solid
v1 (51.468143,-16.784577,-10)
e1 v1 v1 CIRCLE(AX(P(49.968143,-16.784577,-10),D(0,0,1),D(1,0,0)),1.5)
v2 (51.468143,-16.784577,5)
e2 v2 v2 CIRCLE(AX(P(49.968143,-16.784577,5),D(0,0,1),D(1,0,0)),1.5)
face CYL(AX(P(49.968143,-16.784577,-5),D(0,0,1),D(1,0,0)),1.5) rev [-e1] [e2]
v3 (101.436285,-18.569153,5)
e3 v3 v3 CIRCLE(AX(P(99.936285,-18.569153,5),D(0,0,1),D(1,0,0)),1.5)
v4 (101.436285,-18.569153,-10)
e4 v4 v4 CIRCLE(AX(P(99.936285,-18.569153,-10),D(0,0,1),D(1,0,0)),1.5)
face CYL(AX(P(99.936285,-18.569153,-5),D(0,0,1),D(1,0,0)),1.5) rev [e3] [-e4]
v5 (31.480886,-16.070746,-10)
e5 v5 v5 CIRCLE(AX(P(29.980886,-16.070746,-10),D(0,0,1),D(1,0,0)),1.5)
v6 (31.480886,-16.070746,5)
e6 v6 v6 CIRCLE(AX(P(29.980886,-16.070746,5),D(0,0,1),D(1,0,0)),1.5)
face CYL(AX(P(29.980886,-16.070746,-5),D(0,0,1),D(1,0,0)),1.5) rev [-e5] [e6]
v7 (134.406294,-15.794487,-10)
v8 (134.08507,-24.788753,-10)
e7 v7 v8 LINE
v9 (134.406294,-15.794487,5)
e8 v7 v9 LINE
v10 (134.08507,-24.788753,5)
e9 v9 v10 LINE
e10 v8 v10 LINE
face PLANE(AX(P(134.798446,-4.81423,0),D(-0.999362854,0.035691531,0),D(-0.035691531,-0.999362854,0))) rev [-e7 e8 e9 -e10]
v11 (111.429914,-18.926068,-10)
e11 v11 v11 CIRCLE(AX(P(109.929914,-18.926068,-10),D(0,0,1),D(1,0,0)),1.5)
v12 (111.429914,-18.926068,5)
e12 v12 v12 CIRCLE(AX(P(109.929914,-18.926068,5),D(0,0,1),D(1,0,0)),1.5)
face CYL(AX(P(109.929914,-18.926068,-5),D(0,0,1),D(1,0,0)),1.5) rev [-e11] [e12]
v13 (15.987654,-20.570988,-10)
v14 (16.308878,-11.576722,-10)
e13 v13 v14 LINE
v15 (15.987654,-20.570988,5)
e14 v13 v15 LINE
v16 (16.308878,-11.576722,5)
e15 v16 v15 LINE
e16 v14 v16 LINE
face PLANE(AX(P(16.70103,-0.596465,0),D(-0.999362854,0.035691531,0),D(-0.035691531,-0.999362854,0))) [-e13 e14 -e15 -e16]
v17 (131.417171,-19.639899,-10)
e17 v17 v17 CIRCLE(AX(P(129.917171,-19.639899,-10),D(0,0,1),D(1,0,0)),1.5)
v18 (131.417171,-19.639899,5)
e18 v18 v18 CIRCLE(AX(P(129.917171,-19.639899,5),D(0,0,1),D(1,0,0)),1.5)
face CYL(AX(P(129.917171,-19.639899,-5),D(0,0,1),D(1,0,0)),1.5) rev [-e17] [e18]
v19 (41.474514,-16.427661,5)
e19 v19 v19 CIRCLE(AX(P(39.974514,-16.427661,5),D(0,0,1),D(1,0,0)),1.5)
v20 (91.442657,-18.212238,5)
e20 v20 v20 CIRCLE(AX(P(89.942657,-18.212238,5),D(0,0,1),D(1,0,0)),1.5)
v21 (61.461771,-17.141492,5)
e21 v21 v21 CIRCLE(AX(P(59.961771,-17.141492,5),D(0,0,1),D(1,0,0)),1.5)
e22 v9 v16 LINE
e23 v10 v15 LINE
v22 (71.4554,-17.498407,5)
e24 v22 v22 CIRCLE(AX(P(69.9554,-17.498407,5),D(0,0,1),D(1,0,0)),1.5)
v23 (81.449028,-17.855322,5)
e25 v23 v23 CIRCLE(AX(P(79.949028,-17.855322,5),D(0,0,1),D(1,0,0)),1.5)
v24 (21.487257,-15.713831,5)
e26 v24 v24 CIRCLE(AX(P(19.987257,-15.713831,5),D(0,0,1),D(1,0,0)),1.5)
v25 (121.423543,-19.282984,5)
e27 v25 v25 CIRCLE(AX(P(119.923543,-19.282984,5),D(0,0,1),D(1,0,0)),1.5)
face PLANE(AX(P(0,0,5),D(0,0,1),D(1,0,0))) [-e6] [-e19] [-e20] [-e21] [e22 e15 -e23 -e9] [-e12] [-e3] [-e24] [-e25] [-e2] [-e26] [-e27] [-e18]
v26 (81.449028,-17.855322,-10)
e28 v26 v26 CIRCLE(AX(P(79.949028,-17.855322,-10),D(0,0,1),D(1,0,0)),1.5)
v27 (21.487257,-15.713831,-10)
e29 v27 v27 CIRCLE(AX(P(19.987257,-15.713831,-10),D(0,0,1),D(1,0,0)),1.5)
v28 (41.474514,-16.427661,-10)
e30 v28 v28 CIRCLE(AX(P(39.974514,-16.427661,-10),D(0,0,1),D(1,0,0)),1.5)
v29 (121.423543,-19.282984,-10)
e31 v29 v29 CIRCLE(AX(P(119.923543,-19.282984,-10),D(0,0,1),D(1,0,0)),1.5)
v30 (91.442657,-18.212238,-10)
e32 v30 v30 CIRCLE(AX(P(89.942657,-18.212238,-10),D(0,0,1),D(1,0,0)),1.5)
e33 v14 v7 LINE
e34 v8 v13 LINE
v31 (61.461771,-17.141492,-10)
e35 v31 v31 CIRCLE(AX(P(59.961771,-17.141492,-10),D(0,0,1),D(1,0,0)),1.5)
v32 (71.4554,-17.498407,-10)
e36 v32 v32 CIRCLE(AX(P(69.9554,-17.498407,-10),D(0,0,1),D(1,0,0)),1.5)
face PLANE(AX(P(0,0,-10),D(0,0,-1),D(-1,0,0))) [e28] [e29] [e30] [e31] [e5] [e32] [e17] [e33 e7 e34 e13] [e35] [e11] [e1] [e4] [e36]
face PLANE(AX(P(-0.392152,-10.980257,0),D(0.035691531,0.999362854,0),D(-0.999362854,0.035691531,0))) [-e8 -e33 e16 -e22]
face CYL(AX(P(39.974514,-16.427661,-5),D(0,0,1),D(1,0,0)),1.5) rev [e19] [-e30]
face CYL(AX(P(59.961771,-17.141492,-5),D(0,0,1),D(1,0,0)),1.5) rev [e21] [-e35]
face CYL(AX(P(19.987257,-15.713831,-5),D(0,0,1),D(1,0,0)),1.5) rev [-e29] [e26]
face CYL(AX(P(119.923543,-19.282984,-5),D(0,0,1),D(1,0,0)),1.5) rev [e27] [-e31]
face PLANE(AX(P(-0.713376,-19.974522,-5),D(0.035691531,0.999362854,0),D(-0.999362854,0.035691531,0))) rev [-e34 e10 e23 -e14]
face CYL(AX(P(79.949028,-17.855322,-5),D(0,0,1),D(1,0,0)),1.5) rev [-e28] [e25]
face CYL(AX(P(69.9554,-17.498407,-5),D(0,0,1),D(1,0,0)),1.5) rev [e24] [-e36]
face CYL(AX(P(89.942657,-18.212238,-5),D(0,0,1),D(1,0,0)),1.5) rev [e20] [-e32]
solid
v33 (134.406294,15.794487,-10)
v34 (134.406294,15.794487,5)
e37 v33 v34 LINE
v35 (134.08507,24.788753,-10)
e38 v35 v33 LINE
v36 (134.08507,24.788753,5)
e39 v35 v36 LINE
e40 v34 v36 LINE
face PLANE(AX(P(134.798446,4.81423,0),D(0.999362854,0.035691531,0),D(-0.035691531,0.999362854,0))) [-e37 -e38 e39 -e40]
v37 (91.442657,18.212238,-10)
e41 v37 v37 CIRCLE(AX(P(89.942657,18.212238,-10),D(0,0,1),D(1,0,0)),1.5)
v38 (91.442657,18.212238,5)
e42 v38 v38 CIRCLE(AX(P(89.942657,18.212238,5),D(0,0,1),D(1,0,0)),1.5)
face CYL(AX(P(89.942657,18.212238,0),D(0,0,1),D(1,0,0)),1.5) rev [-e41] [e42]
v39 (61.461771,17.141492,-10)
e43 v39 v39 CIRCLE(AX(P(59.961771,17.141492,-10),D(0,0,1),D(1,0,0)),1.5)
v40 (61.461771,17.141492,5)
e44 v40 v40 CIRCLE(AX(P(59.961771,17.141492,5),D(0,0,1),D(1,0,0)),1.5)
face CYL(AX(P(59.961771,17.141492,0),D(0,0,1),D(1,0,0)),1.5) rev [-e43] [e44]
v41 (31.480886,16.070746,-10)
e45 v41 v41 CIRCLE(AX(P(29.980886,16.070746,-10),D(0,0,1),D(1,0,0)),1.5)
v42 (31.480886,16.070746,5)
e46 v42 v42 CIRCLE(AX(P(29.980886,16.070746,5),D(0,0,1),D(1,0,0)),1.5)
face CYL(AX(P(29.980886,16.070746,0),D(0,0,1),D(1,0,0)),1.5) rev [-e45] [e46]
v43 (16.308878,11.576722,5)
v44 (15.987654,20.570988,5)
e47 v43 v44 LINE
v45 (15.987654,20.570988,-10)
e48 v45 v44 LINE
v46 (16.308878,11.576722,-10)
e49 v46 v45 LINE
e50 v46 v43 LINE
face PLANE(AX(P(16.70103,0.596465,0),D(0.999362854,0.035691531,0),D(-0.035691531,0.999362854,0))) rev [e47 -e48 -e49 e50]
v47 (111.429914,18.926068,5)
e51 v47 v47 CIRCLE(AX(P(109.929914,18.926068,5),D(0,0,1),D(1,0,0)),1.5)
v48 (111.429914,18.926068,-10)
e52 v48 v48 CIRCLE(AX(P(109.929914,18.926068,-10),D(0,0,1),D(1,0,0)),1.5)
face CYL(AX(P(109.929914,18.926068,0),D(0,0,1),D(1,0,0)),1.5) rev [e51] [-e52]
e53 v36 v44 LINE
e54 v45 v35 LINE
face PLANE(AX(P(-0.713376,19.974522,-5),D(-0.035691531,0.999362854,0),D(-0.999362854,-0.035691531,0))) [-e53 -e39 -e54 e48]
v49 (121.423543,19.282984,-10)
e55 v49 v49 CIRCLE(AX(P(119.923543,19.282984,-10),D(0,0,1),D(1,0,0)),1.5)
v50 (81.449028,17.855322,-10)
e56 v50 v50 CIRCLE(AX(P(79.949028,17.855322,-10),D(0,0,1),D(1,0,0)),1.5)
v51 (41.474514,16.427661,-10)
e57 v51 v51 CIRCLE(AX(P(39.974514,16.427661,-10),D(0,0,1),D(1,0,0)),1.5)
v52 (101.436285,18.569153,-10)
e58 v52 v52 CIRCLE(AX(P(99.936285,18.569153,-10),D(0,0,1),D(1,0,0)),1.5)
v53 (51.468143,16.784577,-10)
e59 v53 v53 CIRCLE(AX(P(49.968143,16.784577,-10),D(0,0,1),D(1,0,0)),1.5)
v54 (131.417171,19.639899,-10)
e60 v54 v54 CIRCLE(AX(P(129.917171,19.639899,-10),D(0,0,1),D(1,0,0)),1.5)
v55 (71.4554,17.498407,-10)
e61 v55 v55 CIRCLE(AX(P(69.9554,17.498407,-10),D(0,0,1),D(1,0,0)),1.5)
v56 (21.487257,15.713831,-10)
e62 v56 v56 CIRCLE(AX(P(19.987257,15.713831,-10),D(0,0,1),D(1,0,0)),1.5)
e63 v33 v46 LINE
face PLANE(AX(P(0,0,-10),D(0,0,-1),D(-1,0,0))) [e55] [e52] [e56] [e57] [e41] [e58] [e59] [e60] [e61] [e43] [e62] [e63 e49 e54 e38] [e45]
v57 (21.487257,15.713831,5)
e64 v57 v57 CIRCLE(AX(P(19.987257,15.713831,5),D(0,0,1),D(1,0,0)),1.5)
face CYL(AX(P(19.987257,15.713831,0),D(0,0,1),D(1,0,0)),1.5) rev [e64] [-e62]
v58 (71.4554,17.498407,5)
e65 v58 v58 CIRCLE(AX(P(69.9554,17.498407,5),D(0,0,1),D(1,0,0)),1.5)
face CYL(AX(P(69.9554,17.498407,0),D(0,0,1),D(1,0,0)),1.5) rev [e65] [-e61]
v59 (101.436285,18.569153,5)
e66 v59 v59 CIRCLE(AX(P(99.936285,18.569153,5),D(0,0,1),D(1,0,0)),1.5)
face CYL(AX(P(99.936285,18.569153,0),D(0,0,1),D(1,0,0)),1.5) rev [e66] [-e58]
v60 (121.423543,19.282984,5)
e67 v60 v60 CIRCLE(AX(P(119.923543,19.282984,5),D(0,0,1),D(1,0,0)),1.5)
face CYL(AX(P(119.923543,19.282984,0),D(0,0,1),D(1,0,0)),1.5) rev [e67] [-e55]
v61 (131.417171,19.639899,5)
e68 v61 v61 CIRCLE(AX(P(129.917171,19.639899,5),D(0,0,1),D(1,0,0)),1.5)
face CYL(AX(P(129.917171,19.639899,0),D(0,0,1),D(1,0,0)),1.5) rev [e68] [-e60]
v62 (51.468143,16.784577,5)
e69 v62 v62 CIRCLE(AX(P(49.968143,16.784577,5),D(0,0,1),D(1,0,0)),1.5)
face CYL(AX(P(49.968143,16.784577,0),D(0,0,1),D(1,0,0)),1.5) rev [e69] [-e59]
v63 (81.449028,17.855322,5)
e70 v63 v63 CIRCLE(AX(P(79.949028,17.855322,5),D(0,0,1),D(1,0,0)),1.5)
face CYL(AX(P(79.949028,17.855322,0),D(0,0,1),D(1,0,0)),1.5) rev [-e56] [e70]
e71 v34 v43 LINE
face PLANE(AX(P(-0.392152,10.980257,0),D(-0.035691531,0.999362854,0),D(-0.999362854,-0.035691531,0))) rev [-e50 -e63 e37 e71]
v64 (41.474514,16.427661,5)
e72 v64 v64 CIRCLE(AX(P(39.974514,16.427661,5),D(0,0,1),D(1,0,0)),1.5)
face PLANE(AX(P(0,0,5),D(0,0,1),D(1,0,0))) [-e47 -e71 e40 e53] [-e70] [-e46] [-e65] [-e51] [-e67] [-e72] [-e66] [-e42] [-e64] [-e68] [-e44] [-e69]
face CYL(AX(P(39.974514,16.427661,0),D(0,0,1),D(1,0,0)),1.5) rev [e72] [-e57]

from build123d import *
from build123d.topology import SkipClean

# Parameters (mm, degrees)
EXTRUDE_3_DEPTH      = 5
SKETCH_4_R           = 1.5
SKETCH_4_R_2         = 4
CUT_EXTRUDE_3_DEPTH  = 5
SKETCH_5_R           = 11
CUT_EXTRUDE_4_DEPTH  = 2
SKETCH_6_R           = 1.5
CUT_EXTRUDE_6_DEPTH  = 169.745370307
SKETCH_7_R           = 1.5
CUT_EXTRUDE_7_DEPTH  = 10
SKETCH_8_R           = 11
CUT_EXTRUDE_8_DEPTH  = 10
SKETCH_9_R           = 1.5
CUT_EXTRUDE_9_DEPTH  = 10
SKETCH_10_R          = 5
CUT_EXTRUDE_10_DEPTH = 10
SKETCH_11_R          = 1.5
SKETCH_11_R_2        = 2
CUT_EXTRUDE_11_DEPTH = 10
SKETCH_12_W          = 41
SKETCH_12_H          = 22
CUT_EXTRUDE_12_DEPTH = 10
SKETCH_13_R          = 1.5
CUT_EXTRUDE_13_DEPTH = 10
EXTRUDE_4_DEPTH      = 5
SKETCH_15_R          = 1.5
EXTRUDE_6_DEPTH      = 5
SKETCH_16_R          = 1.5
CUT_EXTRUDE_14_DEPTH = 5
EXTRUDE_7_DEPTH      = 5
CUT_EXTRUDE_15_DEPTH = 5
CUT_EXTRUDE_19_DEPTH = 5
SKETCH_21_R          = 1.5
CUT_EXTRUDE_20_DEPTH = 5
EXTRUDE_8_DEPTH      = 10
SKETCH_23_R          = 1.5
CUT_EXTRUDE_21_DEPTH = 15


with BuildPart() as part:
    # 草图1 → 凸台-拉伸3 (new body)
    with BuildSketch(Plane.XY):
        with BuildLine():
            Line((140, 25), (0, 35))
            ThreePointArc((0, 35), (-35, 0), (0, -35))
            Line((0, -35), (140, -25))
            ThreePointArc((140, -25), (165, 0), (140, 25))
        make_face()
    extrude(amount=EXTRUDE_3_DEPTH)

    # 草图4 → 切除-拉伸3 (cut)
    with BuildSketch(Plane.XY.offset(5)):
        with Locations((-5, -5)):
            Circle(SKETCH_4_R)
        with Locations((5, -5)):
            Circle(SKETCH_4_R)
        with Locations((-5, 5)):
            Circle(SKETCH_4_R)
        with Locations((5, 5)):
            Circle(SKETCH_4_R)
        with Locations((135, -5)):
            Circle(SKETCH_4_R)
        with Locations((145, -5)):
            Circle(SKETCH_4_R)
        with Locations((135, 5)):
            Circle(SKETCH_4_R)
        with Locations((145, 5)):
            Circle(SKETCH_4_R)
        Circle(SKETCH_4_R_2)
        with Locations((140, 0)):
            Circle(SKETCH_4_R_2)
    extrude(amount=-CUT_EXTRUDE_3_DEPTH, mode=Mode.SUBTRACT)

    # 草图5 → 切除-拉伸4 (cut)
    with BuildSketch(Plane.XY.offset(5)):
        Circle(SKETCH_5_R)
        with Locations((140, 0)):
            Circle(SKETCH_5_R)
    extrude(amount=-CUT_EXTRUDE_4_DEPTH, mode=Mode.SUBTRACT)

    # 草图6 → 切除-拉伸6 (cut, through all)
    with BuildSketch(Plane.XY.offset(5)):
        with Locations((30, 0)):
            Circle(SKETCH_6_R)
        with Locations((25.980762114, 15)):
            Circle(SKETCH_6_R)
        with Locations((25.980762114, -15)):
            Circle(SKETCH_6_R)
        with Locations((15, 25.980762114)):
            Circle(SKETCH_6_R)
        with Locations((15, -25.980762114)):
            Circle(SKETCH_6_R)
        with Locations((0, 30)):
            Circle(SKETCH_6_R)
        with Locations((0, -30)):
            Circle(SKETCH_6_R)
        with Locations((-15, 25.980762114)):
            Circle(SKETCH_6_R)
        with Locations((-15, -25.980762114)):
            Circle(SKETCH_6_R)
        with Locations((-25.980762114, 15)):
            Circle(SKETCH_6_R)
        with Locations((-25.980762114, -15)):
            Circle(SKETCH_6_R)
        with Locations((-30, 0)):
            Circle(SKETCH_6_R)
        with Locations((160, 0)):
            Circle(SKETCH_6_R)
        with Locations((157.320508076, 10)):
            Circle(SKETCH_6_R)
        with Locations((157.320508076, -10)):
            Circle(SKETCH_6_R)
        with Locations((150, 17.320508076)):
            Circle(SKETCH_6_R)
        with Locations((150, -17.320508076)):
            Circle(SKETCH_6_R)
        with Locations((140, 20)):
            Circle(SKETCH_6_R)
        with Locations((140, -20)):
            Circle(SKETCH_6_R)
        with Locations((130, 17.320508076)):
            Circle(SKETCH_6_R)
        with Locations((130, -17.320508076)):
            Circle(SKETCH_6_R)
        with Locations((122.679491924, 10)):
            Circle(SKETCH_6_R)
        with Locations((122.679491924, -10)):
            Circle(SKETCH_6_R)
        with Locations((120, 0)):
            Circle(SKETCH_6_R)
    extrude(amount=-CUT_EXTRUDE_6_DEPTH, mode=Mode.SUBTRACT)

    # 草图7 → 切除-拉伸7 (cut)
    with SkipClean():  # the faces are left unmerged after this step: merging them gives an invalid solid
        with BuildSketch(Plane.XY.offset(5)):
            with BuildLine():
                ThreePointArc((138.21656051, 24.936305732), (139.107711737, 24.984071359), (140, 25))
                Line((140, 25), (0, 35))
                ThreePointArc((0, 35), (-35, 0), (0, -35))
                Line((0, -35), (140, -25))
                ThreePointArc((140, -25), (139.107711737, -24.984071359), (138.21656051, -24.936305732))
                Line((138.21656051, -24.936305732), (0, -20))
                ThreePointArc((0, -20), (-20, 0), (0, 20))
                Line((0, 20), (138.21656051, 24.936305732))
            make_face()
            with Locations((0, -30)):
                Circle(SKETCH_7_R, mode=Mode.SUBTRACT)
            with Locations((-15, -25.980762114)):
                Circle(SKETCH_7_R, mode=Mode.SUBTRACT)
            with Locations((15, -25.980762114)):
                Circle(SKETCH_7_R, mode=Mode.SUBTRACT)
            with Locations((-25.980762114, -15)):
                Circle(SKETCH_7_R, mode=Mode.SUBTRACT)
            with Locations((-30, 0)):
                Circle(SKETCH_7_R, mode=Mode.SUBTRACT)
            with Locations((-25.980762114, 15)):
                Circle(SKETCH_7_R, mode=Mode.SUBTRACT)
            with Locations((-15, 25.980762114)):
                Circle(SKETCH_7_R, mode=Mode.SUBTRACT)
            with Locations((0, 30)):
                Circle(SKETCH_7_R, mode=Mode.SUBTRACT)
            with Locations((15, 25.980762114)):
                Circle(SKETCH_7_R, mode=Mode.SUBTRACT)
        extrude(amount=-CUT_EXTRUDE_7_DEPTH, mode=Mode.SUBTRACT)

    # 草图8 → 切除-拉伸8 (cut)
    with SkipClean():  # the faces are left unmerged after this step: merging them gives an invalid solid
        with BuildSketch(Plane.XY.offset(5)):
            Circle(SKETCH_8_R)
        extrude(amount=-CUT_EXTRUDE_8_DEPTH, mode=Mode.SUBTRACT)

    # 草图9 → 切除-拉伸9 (cut)
    with SkipClean():  # the faces are left unmerged after this step: merging them gives an invalid solid
        with BuildSketch(Plane.XY.offset(5)):
            with Locations((15, 0)):
                Circle(SKETCH_9_R)
            with Locations((10.606601718, 10.606601718)):
                Circle(SKETCH_9_R)
            with Locations((10.606601718, -10.606601718)):
                Circle(SKETCH_9_R)
            with Locations((0, 15)):
                Circle(SKETCH_9_R)
            with Locations((0, -15)):
                Circle(SKETCH_9_R)
            with Locations((-10.606601718, 10.606601718)):
                Circle(SKETCH_9_R)
            with Locations((-10.606601718, -10.606601718)):
                Circle(SKETCH_9_R)
            with Locations((-15, 0)):
                Circle(SKETCH_9_R)
        extrude(amount=-CUT_EXTRUDE_9_DEPTH, mode=Mode.SUBTRACT)

    # 草图10 → 切除-拉伸10 (cut)
    with SkipClean():  # the faces are left unmerged after this step: merging them gives an invalid solid
        with BuildSketch(Plane.XY.offset(3)):
            with Locations((140, 0)):
                Circle(SKETCH_10_R)
        extrude(amount=-CUT_EXTRUDE_10_DEPTH, mode=Mode.SUBTRACT)

    # 草图11 → 切除-拉伸11 (cut)
    # profile 1 of 5: a face of its own
    with SkipClean():  # the faces are left unmerged after this step: merging them gives an invalid solid
        with BuildSketch(Plane.XY.offset(5)):
            with BuildLine():
                Line((124.179491924, -10), (150, -10))
                Line((150, -10), (150, 10))
                Line((150, 10), (124.179491924, 10))
                ThreePointArc((124.179491924, 10), (122.679491924, 8.5), (121.179491924, 10))
                Line((121.179491924, 10), (110, 10))
                Line((110, 10), (110, -10))
                Line((110, -10), (121.179491924, -10))
                ThreePointArc((121.179491924, -10), (122.679491924, -8.5), (124.179491924, -10))
            make_face()
            with Locations((120, 0)):
                Circle(SKETCH_11_R, mode=Mode.SUBTRACT)
        # profile 2 of 5: a face of its own
        with BuildSketch(Plane.XY.offset(5)):
            with Locations((105.5, 5)):
                Circle(SKETCH_11_R_2)
        # profile 3 of 5: a face of its own
        with BuildSketch(Plane.XY.offset(5)):
            with Locations((105.5, -5)):
                Circle(SKETCH_11_R_2)
        # profile 4 of 5: a face of its own
        with BuildSketch(Plane.XY.offset(5)):
            with Locations((154.5, -5)):
                Circle(SKETCH_11_R_2)
        # profile 5 of 5: a face of its own
        with BuildSketch(Plane.XY.offset(5)):
            with Locations((154.5, 5)):
                Circle(SKETCH_11_R_2)
        extrude(amount=-CUT_EXTRUDE_11_DEPTH, mode=Mode.SUBTRACT)

    # 草图12 → 切除-拉伸12 (cut)
    with SkipClean():  # the faces are left unmerged after this step: merging them gives an invalid solid
        with BuildSketch(Plane.XY.offset(5)):
            with Locations((130, 0)):
                Rectangle(SKETCH_12_W, SKETCH_12_H)
        extrude(amount=-CUT_EXTRUDE_12_DEPTH, mode=Mode.SUBTRACT)

    # 草图13 → 切除-拉伸13 (cut)
    with SkipClean():  # the faces are left unmerged after this step: merging them gives an invalid solid
        with BuildSketch(Plane.XY.offset(5)):
            with BuildLine():
                ThreePointArc((129.008722028, -18.446282468), (129.863637935, -21.138943397), (130.908449037, -18.514124575))
                ThreePointArc((130.908449037, -18.514124575), (129.94646687, -18.819552506), (129.008722028, -18.446282468))
            make_face()
            with Locations((119.923542522, -19.282983661)):
                Circle(SKETCH_13_R)
            with Locations((109.929913978, -18.926068356)):
                Circle(SKETCH_13_R)
            with Locations((99.936285435, -18.569153051)):
                Circle(SKETCH_13_R)
            with Locations((89.942656891, -18.212237746)):
                Circle(SKETCH_13_R)
            with Locations((79.949028348, -17.855322441)):
                Circle(SKETCH_13_R)
            with Locations((69.955399804, -17.498407136)):
                Circle(SKETCH_13_R)
            with Locations((59.961771261, -17.141491831)):
                Circle(SKETCH_13_R)
            with Locations((49.968142717, -16.784576526)):
                Circle(SKETCH_13_R)
            with Locations((39.974514174, -16.42766122)):
                Circle(SKETCH_13_R)
            with Locations((29.98088563, -16.070745915)):
                Circle(SKETCH_13_R)
            with Locations((19.987257087, -15.71383061)):
                Circle(SKETCH_13_R)
            with Locations((9.993628543, -15.356915305)):
                Circle(SKETCH_13_R)
        extrude(amount=-CUT_EXTRUDE_13_DEPTH, mode=Mode.SUBTRACT)

    # 草图14 → 凸台-拉伸4 (add)
    with SkipClean():  # the faces are left unmerged after this step: merging them gives an invalid solid
        with BuildSketch(Plane.XY.offset(5)):
            with BuildLine():
                ThreePointArc((130.908449037, -18.514124575), (131.344000289, -17.986588568), (131.5, -17.320508076))
                ThreePointArc((131.5, -17.320508076), (129.382309527, -15.953592395), (129.008722028, -18.446282468))
                ThreePointArc((129.008722028, -18.446282468), (129.970704195, -18.140854536), (130.908449037, -18.514124575))
            make_face()
        extrude(amount=-EXTRUDE_4_DEPTH)

    # 草图15 → 凸台-拉伸6 (add)
    with SkipClean():  # the faces are left unmerged after this step: merging them gives an invalid solid
        with BuildSketch(Plane.XY.offset(5)):
            with Locations((25.980762114, 15)):
                Circle(SKETCH_15_R)
            with Locations((30, 0)):
                Circle(SKETCH_15_R)
            with Locations((25.980762114, -15)):
                Circle(SKETCH_15_R)
        extrude(amount=-EXTRUDE_6_DEPTH)

    # 草图16 → 切除-拉伸14 (cut)
    with SkipClean():  # the faces are left unmerged after this step: merging them gives an invalid solid
        with BuildSketch(Plane.XY.offset(5)):
            with Locations((129.917171065, 19.639898967)):
                Circle(SKETCH_16_R)
            with Locations((119.923542522, 19.282983661)):
                Circle(SKETCH_16_R)
            with Locations((109.929913978, 18.926068356)):
                Circle(SKETCH_16_R)
            with Locations((99.936285435, 18.569153051)):
                Circle(SKETCH_16_R)
            with Locations((89.942656891, 18.212237746)):
                Circle(SKETCH_16_R)
            with Locations((79.949028348, 17.855322441)):
                Circle(SKETCH_16_R)
            with Locations((69.955399804, 17.498407136)):
                Circle(SKETCH_16_R)
            with Locations((59.961771261, 17.141491831)):
                Circle(SKETCH_16_R)
            with Locations((49.968142717, 16.784576526)):
                Circle(SKETCH_16_R)
            with Locations((39.974514174, 16.42766122)):
                Circle(SKETCH_16_R)
            with Locations((29.98088563, 16.070745915)):
                Circle(SKETCH_16_R)
            with Locations((19.987257087, 15.71383061)):
                Circle(SKETCH_16_R)
            with Locations((9.993628543, 15.356915305)):
                Circle(SKETCH_16_R)
        extrude(amount=-CUT_EXTRUDE_14_DEPTH, mode=Mode.SUBTRACT)

    # 草图17 → 凸台-拉伸7 (add)
    with SkipClean():  # the faces are left unmerged after this step: merging them gives an invalid solid
        with BuildSketch(Plane.XY.offset(5)):
            with BuildLine():
                ThreePointArc((129.008722028, 18.446282468), (129.382309527, 15.953592395), (131.5, 17.320508076))
                ThreePointArc((131.5, 17.320508076), (131.344000289, 17.986588568), (130.908449037, 18.514124575))
                ThreePointArc((130.908449037, 18.514124575), (129.970704195, 18.140854536), (129.008722028, 18.446282468))
            make_face()
        extrude(amount=-EXTRUDE_7_DEPTH)

    # 草图18 → 切除-拉伸15 (cut)
    with SkipClean():  # the faces are left unmerged after this step: merging them gives an invalid solid
        with BuildSketch(Plane.XY.offset(5)):
            with BuildLine():
                ThreePointArc((100, 0), (99.769776761, 6.781714021), (99.080167099, 13.532201878))
                Line((99.080167099, 13.532201878), (22.547372848, 10.798887797))
                ThreePointArc((22.547372848, 10.798887797), (24.379133713, 5.536952176), (25, 0))
                ThreePointArc((25, 0), (24.379133713, -5.536952176), (22.547372848, -10.798887797))
                Line((22.547372848, -10.798887797), (99.080167099, -13.532201878))
                ThreePointArc((99.080167099, -13.532201878), (99.769776761, -6.781714021), (100, 0))
            make_face()
        extrude(amount=-CUT_EXTRUDE_15_DEPTH, mode=Mode.SUBTRACT)

    # 草图19 → 切除-拉伸19 (cut)
    with SkipClean():  # the faces are left unmerged after this step: merging them gives an invalid solid
        with BuildSketch(Plane.XY.offset(5)):
            with BuildLine():
                Line((134.406294114, 15.794486823), (16.308878209, 11.576721969))
                Line((16.308878209, 11.576721969), (15.987654435, 20.570987658))
                Line((15.987654435, 20.570987658), (0, 20))
                ThreePointArc((0, 20), (-20, 0), (0, -20))
                Line((0, -20), (15.987654435, -20.570987658))
                Line((15.987654435, -20.570987658), (16.308878209, -11.576721969))
                Line((16.308878209, -11.576721969), (134.406294114, -15.794486823))
                ThreePointArc((134.406294114, -15.794486823), (156.755756012, 0), (134.406294114, 15.794486823))
            make_face()
        extrude(amount=-CUT_EXTRUDE_19_DEPTH, mode=Mode.SUBTRACT)

    # 草图21 → 切除-拉伸20 (cut)
    with SkipClean():  # the faces are left unmerged after this step: merging them gives an invalid solid
        with BuildSketch(Plane.XY.offset(5)):
            with BuildLine():
                ThreePointArc((134.406294114, 15.794486823), (146.604776394, 15.399100244), (155.298987649, 6.833471771))
                ThreePointArc((155.298987649, 6.833471771), (156.390745963, 5.651981367), (156.259259804, 4.048682523))
                ThreePointArc((156.259259804, 4.048682523), (156.755756012, 0), (156.259259804, -4.048682523))
                ThreePointArc((156.259259804, -4.048682523), (156.390745963, -5.651981367), (155.298987649, -6.833471771))
                ThreePointArc((155.298987649, -6.833471771), (146.604776394, -15.399100244), (134.406294114, -15.794486823))
                Line((134.406294114, -15.794486823), (134.08507034, -24.788752512))
                Line((134.08507034, -24.788752512), (138.21656051, -24.936305732))
                ThreePointArc((138.21656051, -24.936305732), (165, 0), (138.21656051, 24.936305732))
                Line((138.21656051, 24.936305732), (134.08507034, 24.788752512))
                Line((134.08507034, 24.788752512), (134.406294114, 15.794486823))
            make_face()
            with Locations((140, -20)):
                Circle(SKETCH_21_R, mode=Mode.SUBTRACT)
            with Locations((150, -17.320508076)):
                Circle(SKETCH_21_R, mode=Mode.SUBTRACT)
            with Locations((157.320508076, -10)):
                Circle(SKETCH_21_R, mode=Mode.SUBTRACT)
            with Locations((160, 0)):
                Circle(SKETCH_21_R, mode=Mode.SUBTRACT)
            with Locations((157.320508076, 10)):
                Circle(SKETCH_21_R, mode=Mode.SUBTRACT)
            with Locations((150, 17.320508076)):
                Circle(SKETCH_21_R, mode=Mode.SUBTRACT)
            with Locations((140, 20)):
                Circle(SKETCH_21_R, mode=Mode.SUBTRACT)
        extrude(amount=-CUT_EXTRUDE_20_DEPTH, mode=Mode.SUBTRACT)


with BuildPart() as cut_extrude_20_piece_1:
    # of the separate pieces the step leaves, piece 1, a body of its own (cut_extrude_20_pieces)
    add(part.part.solids().sort_by_distance((134.08507034, 24.788752512, 0))[0])



with BuildPart() as cut_extrude_20_piece_2:
    # of the separate pieces the step leaves, piece 2, a body of its own (cut_extrude_20_pieces)
    add(part.part.solids().sort_by_distance((134.08507034, -24.788752512, 0))[0])


with BuildPart() as cut_extrude_20_piece_1_1:
    with SkipClean():  # the faces are left unmerged after this step: merging them gives an invalid solid
        add(cut_extrude_20_piece_1.part)

        add(cut_extrude_20_piece_2.part)  # 凸台-拉伸8 merges 切除-拉伸20 piece 2
        # 草图22 → 凸台-拉伸8 (add)
        with BuildSketch(Plane(origin=(0, 0, 0), x_dir=(-1, 0, 0), z_dir=(0, 0, -1))):
            Polygon((-134.08507034, 24.788752512), (-134.406294114, 15.794486823), (-16.308878209, 11.576721969), (-15.987654435, 20.570987658), align=None)
            Polygon((-134.406294114, -15.794486823), (-134.08507034, -24.788752512), (-15.987654435, -20.570987658), (-16.308878209, -11.576721969), align=None)
        extrude(amount=EXTRUDE_8_DEPTH)

    # 草图23 → 切除-拉伸21 (cut)
    with SkipClean():  # the faces are left unmerged after this step: merging them gives an invalid solid
        with BuildSketch(Plane.XY.offset(5)):
            with Locations((19.987257087, 15.71383061)):
                Circle(SKETCH_23_R)
            with Locations((29.98088563, 16.070745915)):
                Circle(SKETCH_23_R)
            with Locations((39.974514174, 16.42766122)):
                Circle(SKETCH_23_R)
            with Locations((49.968142717, 16.784576526)):
                Circle(SKETCH_23_R)
            with Locations((59.961771261, 17.141491831)):
                Circle(SKETCH_23_R)
            with Locations((69.955399804, 17.498407136)):
                Circle(SKETCH_23_R)
            with Locations((79.949028348, 17.855322441)):
                Circle(SKETCH_23_R)
            with Locations((89.942656891, 18.212237746)):
                Circle(SKETCH_23_R)
            with Locations((99.936285435, 18.569153051)):
                Circle(SKETCH_23_R)
            with Locations((109.929913978, 18.926068356)):
                Circle(SKETCH_23_R)
            with Locations((119.923542522, 19.282983661)):
                Circle(SKETCH_23_R)
            with Locations((129.917171065, 19.639898967)):
                Circle(SKETCH_23_R)
            with Locations((129.917171065, -19.639898967)):
                Circle(SKETCH_23_R)
            with Locations((119.923542522, -19.282983661)):
                Circle(SKETCH_23_R)
            with Locations((109.929913978, -18.926068356)):
                Circle(SKETCH_23_R)
            with Locations((99.936285435, -18.569153051)):
                Circle(SKETCH_23_R)
            with Locations((89.942656891, -18.212237746)):
                Circle(SKETCH_23_R)
            with Locations((79.949028348, -17.855322441)):
                Circle(SKETCH_23_R)
            with Locations((69.955399804, -17.498407136)):
                Circle(SKETCH_23_R)
            with Locations((59.961771261, -17.141491831)):
                Circle(SKETCH_23_R)
            with Locations((49.968142717, -16.784576526)):
                Circle(SKETCH_23_R)
            with Locations((39.974514174, -16.42766122)):
                Circle(SKETCH_23_R)
            with Locations((29.98088563, -16.070745915)):
                Circle(SKETCH_23_R)
            with Locations((19.987257087, -15.71383061)):
                Circle(SKETCH_23_R)
        extrude(amount=-CUT_EXTRUDE_21_DEPTH, mode=Mode.SUBTRACT)


solid = cut_extrude_20_piece_1_1.part
